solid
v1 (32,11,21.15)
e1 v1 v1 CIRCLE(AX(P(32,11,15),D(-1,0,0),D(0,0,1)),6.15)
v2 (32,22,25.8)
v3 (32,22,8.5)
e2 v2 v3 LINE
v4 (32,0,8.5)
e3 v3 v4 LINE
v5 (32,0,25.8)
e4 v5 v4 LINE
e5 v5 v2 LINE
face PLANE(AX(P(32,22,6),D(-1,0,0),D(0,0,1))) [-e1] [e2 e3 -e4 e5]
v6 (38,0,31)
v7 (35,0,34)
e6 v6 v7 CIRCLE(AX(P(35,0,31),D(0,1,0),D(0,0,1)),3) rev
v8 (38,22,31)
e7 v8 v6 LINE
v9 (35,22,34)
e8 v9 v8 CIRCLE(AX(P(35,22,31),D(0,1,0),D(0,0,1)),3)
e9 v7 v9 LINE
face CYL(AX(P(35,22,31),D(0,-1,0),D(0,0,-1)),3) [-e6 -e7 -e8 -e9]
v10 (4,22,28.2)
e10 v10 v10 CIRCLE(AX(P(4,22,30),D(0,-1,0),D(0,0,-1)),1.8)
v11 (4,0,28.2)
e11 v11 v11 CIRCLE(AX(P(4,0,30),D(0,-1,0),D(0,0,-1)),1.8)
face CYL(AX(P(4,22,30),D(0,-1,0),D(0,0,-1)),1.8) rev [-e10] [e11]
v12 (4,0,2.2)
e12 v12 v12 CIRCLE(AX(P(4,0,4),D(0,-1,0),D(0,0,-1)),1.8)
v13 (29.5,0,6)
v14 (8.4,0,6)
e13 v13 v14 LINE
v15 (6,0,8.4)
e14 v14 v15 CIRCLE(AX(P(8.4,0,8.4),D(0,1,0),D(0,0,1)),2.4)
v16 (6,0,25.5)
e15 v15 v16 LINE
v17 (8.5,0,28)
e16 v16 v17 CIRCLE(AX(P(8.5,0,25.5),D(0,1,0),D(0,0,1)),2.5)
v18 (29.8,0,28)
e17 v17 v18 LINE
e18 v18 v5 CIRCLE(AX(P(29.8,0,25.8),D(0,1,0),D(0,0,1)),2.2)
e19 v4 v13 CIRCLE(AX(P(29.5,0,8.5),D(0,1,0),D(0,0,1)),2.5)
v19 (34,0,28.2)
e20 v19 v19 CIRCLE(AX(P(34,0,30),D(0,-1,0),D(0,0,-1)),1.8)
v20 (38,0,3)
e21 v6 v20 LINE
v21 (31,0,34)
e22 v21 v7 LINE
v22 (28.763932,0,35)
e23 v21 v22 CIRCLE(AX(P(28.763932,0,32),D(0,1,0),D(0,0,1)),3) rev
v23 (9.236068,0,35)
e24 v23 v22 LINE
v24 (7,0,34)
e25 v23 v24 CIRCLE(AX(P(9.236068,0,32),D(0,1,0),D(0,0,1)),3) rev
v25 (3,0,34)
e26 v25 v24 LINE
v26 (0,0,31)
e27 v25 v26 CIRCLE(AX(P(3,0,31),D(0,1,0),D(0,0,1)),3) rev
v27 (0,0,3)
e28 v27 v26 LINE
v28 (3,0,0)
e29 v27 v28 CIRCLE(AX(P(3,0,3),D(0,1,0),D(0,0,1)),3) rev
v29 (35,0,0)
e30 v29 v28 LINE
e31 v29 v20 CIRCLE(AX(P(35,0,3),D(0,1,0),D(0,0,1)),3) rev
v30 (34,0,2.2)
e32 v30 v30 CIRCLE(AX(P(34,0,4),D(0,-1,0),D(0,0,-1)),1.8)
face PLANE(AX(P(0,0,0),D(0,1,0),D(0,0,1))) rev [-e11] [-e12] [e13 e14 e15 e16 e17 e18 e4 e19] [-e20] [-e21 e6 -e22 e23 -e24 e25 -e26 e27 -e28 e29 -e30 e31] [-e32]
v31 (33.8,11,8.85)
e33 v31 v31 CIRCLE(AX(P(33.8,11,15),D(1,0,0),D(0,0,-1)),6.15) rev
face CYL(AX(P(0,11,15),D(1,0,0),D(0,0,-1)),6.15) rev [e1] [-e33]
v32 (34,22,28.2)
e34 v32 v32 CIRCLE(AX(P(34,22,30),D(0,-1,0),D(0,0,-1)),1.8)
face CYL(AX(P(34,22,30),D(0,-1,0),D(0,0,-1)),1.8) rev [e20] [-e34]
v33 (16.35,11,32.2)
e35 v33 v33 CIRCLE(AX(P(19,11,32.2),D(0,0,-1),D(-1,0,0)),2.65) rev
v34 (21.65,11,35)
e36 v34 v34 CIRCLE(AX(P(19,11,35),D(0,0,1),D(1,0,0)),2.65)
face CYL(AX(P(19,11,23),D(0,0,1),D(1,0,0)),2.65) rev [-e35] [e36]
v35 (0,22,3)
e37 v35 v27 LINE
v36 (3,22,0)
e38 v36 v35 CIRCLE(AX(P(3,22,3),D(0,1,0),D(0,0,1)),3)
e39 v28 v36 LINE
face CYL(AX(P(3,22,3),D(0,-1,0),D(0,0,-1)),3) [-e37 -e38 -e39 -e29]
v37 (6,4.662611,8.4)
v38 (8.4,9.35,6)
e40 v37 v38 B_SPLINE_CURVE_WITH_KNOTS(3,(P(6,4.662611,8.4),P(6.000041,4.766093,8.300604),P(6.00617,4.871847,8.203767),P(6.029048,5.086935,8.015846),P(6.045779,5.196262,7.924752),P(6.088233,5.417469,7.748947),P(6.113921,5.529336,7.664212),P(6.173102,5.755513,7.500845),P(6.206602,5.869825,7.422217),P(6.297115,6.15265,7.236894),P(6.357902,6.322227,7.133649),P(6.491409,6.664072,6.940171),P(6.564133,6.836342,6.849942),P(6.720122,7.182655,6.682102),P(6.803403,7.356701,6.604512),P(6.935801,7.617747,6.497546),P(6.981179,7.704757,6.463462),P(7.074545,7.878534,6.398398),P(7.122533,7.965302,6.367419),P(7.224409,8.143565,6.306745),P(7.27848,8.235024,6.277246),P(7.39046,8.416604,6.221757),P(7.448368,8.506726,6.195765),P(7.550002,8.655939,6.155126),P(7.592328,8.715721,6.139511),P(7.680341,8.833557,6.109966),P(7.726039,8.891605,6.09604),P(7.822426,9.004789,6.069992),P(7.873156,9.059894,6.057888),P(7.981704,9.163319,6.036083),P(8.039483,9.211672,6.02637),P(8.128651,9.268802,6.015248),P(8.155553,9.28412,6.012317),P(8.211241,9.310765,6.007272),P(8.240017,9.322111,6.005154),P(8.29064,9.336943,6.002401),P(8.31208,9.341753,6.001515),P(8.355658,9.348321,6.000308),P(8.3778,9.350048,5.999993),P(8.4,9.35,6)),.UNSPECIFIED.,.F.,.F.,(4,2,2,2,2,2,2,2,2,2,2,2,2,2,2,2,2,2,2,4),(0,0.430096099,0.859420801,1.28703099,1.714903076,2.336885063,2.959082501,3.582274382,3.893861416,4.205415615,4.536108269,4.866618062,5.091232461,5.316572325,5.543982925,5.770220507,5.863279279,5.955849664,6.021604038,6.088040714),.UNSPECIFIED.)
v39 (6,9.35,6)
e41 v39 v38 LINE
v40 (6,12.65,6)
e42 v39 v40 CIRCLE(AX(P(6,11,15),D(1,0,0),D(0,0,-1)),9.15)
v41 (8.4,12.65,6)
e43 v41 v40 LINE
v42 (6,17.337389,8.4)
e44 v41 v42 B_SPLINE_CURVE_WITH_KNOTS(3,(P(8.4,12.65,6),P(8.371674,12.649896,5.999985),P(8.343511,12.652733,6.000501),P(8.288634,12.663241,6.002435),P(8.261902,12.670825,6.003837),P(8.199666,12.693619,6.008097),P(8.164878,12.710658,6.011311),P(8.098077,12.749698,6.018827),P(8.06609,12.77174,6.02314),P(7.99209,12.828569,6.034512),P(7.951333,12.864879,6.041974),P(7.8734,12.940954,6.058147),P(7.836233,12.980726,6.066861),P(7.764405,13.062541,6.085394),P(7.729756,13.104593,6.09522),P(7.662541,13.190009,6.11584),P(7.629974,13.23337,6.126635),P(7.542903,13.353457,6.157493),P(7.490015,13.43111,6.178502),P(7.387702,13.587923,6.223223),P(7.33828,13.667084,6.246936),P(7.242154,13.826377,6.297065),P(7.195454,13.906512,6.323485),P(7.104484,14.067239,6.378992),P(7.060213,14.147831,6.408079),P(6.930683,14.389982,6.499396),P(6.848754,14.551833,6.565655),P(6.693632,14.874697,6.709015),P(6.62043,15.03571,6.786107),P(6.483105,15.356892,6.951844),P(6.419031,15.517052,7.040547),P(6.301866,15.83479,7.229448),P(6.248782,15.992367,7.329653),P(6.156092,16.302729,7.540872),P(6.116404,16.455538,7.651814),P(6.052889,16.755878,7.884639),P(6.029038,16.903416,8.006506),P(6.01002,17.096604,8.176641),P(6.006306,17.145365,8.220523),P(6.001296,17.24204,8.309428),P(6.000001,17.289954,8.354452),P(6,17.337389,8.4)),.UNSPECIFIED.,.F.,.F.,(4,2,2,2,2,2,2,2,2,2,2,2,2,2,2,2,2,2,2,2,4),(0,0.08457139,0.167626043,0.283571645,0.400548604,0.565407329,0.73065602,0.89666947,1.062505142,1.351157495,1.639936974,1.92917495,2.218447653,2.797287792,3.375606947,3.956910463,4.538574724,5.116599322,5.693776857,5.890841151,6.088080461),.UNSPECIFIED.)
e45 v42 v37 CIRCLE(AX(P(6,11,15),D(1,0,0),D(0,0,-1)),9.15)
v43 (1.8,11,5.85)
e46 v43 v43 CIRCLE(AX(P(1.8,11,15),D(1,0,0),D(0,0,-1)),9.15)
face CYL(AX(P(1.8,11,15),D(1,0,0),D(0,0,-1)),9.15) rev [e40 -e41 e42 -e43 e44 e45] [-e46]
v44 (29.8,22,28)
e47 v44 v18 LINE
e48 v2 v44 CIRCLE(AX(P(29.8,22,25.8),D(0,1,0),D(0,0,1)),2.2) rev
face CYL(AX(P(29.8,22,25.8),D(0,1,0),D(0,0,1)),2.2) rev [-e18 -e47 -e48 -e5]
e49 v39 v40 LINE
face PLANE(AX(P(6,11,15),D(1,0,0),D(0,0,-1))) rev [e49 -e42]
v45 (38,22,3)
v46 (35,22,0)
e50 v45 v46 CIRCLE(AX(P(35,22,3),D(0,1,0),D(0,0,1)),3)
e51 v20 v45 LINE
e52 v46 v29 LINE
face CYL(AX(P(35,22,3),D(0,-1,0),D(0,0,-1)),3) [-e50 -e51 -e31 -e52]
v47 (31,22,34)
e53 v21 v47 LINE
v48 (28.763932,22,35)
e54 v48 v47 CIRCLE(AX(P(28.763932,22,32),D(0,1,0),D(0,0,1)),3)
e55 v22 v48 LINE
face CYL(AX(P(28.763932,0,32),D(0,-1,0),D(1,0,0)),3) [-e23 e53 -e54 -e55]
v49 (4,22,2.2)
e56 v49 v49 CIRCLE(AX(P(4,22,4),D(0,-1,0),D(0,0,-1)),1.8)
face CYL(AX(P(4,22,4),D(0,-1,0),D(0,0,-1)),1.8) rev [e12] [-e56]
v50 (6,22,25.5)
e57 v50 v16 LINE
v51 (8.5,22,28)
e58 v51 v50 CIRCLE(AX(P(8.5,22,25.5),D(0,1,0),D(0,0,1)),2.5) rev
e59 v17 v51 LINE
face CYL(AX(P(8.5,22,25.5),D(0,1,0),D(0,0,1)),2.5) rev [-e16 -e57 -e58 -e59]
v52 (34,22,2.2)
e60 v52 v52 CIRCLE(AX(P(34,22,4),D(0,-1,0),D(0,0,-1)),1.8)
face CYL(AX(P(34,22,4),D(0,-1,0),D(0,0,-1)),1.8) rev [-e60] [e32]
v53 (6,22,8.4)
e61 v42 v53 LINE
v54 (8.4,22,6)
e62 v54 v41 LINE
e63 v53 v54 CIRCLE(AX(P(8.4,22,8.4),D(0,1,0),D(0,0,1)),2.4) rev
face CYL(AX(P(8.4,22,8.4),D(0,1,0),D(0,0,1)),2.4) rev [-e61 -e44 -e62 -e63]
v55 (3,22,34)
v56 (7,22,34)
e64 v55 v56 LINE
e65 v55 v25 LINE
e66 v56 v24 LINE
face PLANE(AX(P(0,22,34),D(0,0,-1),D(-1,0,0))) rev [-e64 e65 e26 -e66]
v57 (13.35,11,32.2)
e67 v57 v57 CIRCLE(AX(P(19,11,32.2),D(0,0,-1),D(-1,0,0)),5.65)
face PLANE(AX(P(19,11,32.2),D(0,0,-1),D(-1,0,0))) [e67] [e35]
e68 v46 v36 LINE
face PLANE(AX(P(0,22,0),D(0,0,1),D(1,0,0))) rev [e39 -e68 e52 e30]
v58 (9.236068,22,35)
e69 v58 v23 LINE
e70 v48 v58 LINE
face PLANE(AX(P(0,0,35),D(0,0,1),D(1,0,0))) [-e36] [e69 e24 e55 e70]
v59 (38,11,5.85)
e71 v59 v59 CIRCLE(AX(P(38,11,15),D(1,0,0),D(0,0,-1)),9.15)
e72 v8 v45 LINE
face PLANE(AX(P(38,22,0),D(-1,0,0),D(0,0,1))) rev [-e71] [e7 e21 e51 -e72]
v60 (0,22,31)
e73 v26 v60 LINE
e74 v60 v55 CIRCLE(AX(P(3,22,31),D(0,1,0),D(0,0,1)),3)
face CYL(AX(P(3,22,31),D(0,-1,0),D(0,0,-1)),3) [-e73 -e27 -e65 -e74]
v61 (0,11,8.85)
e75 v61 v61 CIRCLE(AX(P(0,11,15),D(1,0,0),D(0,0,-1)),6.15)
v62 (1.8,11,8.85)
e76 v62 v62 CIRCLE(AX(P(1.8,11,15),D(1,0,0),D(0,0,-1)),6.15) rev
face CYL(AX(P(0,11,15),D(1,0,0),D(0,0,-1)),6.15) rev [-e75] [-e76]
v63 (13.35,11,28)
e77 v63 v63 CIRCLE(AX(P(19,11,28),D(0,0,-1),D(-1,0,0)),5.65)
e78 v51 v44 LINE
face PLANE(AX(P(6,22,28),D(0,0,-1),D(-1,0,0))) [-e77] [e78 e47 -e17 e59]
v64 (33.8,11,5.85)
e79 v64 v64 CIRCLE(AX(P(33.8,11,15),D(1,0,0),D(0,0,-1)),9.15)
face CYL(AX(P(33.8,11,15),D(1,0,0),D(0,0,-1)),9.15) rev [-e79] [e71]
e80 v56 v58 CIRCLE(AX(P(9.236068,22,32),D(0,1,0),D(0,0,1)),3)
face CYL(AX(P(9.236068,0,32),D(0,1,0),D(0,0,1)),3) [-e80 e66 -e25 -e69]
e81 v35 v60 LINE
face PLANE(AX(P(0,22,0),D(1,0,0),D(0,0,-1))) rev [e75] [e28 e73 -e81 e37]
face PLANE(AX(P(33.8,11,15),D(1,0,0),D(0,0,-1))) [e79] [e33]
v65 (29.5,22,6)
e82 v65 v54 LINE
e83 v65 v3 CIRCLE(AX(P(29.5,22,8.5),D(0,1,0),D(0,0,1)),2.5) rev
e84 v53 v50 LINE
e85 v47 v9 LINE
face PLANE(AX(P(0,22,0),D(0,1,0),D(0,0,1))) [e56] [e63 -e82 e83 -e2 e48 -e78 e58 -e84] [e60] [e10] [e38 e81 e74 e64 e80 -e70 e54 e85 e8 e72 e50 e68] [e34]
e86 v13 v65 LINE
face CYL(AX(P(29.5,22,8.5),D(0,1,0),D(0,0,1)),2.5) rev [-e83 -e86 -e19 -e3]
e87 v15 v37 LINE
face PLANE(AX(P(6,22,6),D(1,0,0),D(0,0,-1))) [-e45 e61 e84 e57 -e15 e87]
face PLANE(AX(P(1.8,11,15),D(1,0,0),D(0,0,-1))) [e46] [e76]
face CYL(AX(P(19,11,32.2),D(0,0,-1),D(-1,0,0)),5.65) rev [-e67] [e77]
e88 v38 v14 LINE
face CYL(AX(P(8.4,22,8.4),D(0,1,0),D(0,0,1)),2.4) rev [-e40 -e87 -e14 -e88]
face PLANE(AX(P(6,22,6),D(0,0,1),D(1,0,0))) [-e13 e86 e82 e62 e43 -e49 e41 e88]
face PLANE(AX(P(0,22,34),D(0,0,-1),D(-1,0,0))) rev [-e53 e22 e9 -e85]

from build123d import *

# Parameters (mm, degrees)
SKETCH3_W           = 38
SKETCH3_H           = 34
SKETCH3_W_2         = 26
SKETCH3_H_2         = 22
BOSS_EXTRUDE1_DEPTH = 22
SKETCH4_W           = 24
SKETCH4_H           = 22
BOSS_EXTRUDE2_DEPTH = 1
SKETCH5_R           = 2.65
CUT_EXTRUDE1_DEPTH  = 12
SKETCH7_R           = 5.65
CUT_EXTRUDE3_DEPTH  = 4.2
SKETCH8_R           = 6.15
CUT_EXTRUDE4_DEPTH  = 57.151580565
SKETCH9_R           = 9.15
CUT_EXTRUDE5_DEPTH  = 4.2
SKETCH10_R          = 9.15
CUT_EXTRUDE6_DEPTH  = 4.2
SKETCH15_R          = 1.8
CUT_EXTRUDE7_DEPTH  = 57.151580565
FILLET1_R           = 3
FILLET3_R           = 2.5
FILLET4_R           = 2.2
FILLET5_R           = 2.4


with BuildPart() as part:
    # Sketch3 → Boss-Extrude1 (new body)
    with BuildSketch(Plane(origin=(0, 0, 0), x_dir=(1, 0, 0), z_dir=(0, 1, 0))):
        with Locations((19, -17)):
            Rectangle(SKETCH3_W, SKETCH3_H)
        with Locations((19, -17)):
            Rectangle(SKETCH3_W_2, SKETCH3_H_2, mode=Mode.SUBTRACT)
    extrude(amount=BOSS_EXTRUDE1_DEPTH)

    # Sketch4 → Boss-Extrude2 (add)
    with BuildSketch(Plane.XY.offset(34)):
        with Locations((19, 11)):
            Rectangle(SKETCH4_W, SKETCH4_H)
    extrude(amount=BOSS_EXTRUDE2_DEPTH)

    # Sketch5 → Cut-Extrude1 (cut)
    with BuildSketch(Plane.XY.offset(35)):
        with Locations((19, 11)):
            Circle(SKETCH5_R)
    extrude(amount=-CUT_EXTRUDE1_DEPTH, mode=Mode.SUBTRACT)

    # Sketch7 → Cut-Extrude3 (cut)
    with BuildSketch(Plane(origin=(0, 0, 28), x_dir=(-1, 0, 0), z_dir=(0, 0, -1))):
        with Locations((-19, 11)):
            Circle(SKETCH7_R)
    extrude(amount=-CUT_EXTRUDE3_DEPTH, mode=Mode.SUBTRACT)

    # Sketch8 → Cut-Extrude4 (cut, through all)
    with BuildSketch(Plane(origin=(38, 0, 0), x_dir=(0, 0, -1), z_dir=(1, 0, 0))):
        with Locations((-15, 11)):
            Circle(SKETCH8_R)
    extrude(amount=-CUT_EXTRUDE4_DEPTH, mode=Mode.SUBTRACT)

    # Sketch9 → Cut-Extrude5 (cut)
    with BuildSketch(Plane(origin=(6, 0, 0), x_dir=(0, 0, -1), z_dir=(1, 0, 0))):
        with Locations((-15, 11)):
            Circle(SKETCH9_R)
    extrude(amount=-CUT_EXTRUDE5_DEPTH, mode=Mode.SUBTRACT)

    # Sketch10 → Cut-Extrude6 (cut)
    with BuildSketch(Plane(origin=(38, 0, 0), x_dir=(0, 0, -1), z_dir=(1, 0, 0))):
        with Locations((-15, 11)):
            Circle(SKETCH10_R)
    extrude(amount=-CUT_EXTRUDE6_DEPTH, mode=Mode.SUBTRACT)

    # Sketch15 → Cut-Extrude7 (cut, through all)
    with BuildSketch(Plane(origin=(0, 0, 0), x_dir=(-1, 0, 0), z_dir=(0, -1, 0))):
        with Locations(Location((-4, -30, 0), (0, 0, 90))):
            Circle(SKETCH15_R)
        with Locations(Location((-34, -30, 0), (0, 0, 90))):
            Circle(SKETCH15_R)
        with Locations(Location((-34, -4, 0), (0, 0, 90))):
            Circle(SKETCH15_R)
        with Locations(Location((-4, -4, 0), (0, 0, 90))):
            Circle(SKETCH15_R)
    extrude(amount=-CUT_EXTRUDE7_DEPTH, mode=Mode.SUBTRACT)

    # Fillet1
    # the kernel refuses this fillet: 3 mm, written as the material it takes off along each edge
    with BuildSketch(Plane(origin=(38, -7.5, 0), x_dir=(-1, 0, 0), z_dir=(0, 1, 0)), Plane(origin=(38, -7.5, 34), x_dir=(0, 0, -1), z_dir=(0, 1, 0))) as fillet1_piece_1:
        with BuildLine():
            CenterArc((FILLET1_R, FILLET1_R), FILLET1_R, 180, 90)
            Line((0, FILLET1_R), (-FILLET1_R * 0.02, FILLET1_R))
            Line((-FILLET1_R * 0.02, FILLET1_R), (-FILLET1_R * 0.02, -FILLET1_R * 0.02))
            Line((-FILLET1_R * 0.02, -FILLET1_R * 0.02), (FILLET1_R, -FILLET1_R * 0.02))
            Line((FILLET1_R, -FILLET1_R * 0.02), (FILLET1_R, 0))
        make_face()
    extrude(amount=37, mode=Mode.SUBTRACT)
    with BuildSketch(Plane(origin=(7, -5.590169944, 35), x_dir=(0, 0, -1), z_dir=(0, 1, 0)), Plane(origin=(31, 27.590169944, 35), x_dir=(0, 0, -1), z_dir=(0, -1, 0))) as fillet1_piece_2:
        with BuildLine():
            CenterArc((3, -2.236067977), FILLET1_R, 131.810314896, 48.189685104)
            Line((0, -2.236067977), (-0.06, -2.236067977))
            Line((-0.06, -2.236067977), (-0.06, 0))
            Line((-0.06, 0), (0, 0.06))
            ThreePointArc((0, 0.06), (0.5, 0.06), (0.96, 0.04472136))
            Line((0.96, 0.04472136), (1, 0))
        make_face()
    extrude(amount=33.180339887, mode=Mode.SUBTRACT)
    with BuildSketch(Plane(origin=(0, -7.5, 34), x_dir=(0, 0, -1), z_dir=(0, 1, 0)), Plane(origin=(0, -7.5, 0), x_dir=(1, 0, 0), z_dir=(0, 1, 0))) as fillet1_piece_3:
        with BuildLine():
            CenterArc((FILLET1_R, -FILLET1_R), FILLET1_R, 90, 90)
            Line((0, -FILLET1_R), (-FILLET1_R * 0.02, -FILLET1_R))
            Line((-FILLET1_R * 0.02, -FILLET1_R), (-FILLET1_R * 0.02, FILLET1_R * 0.02))
            Line((-FILLET1_R * 0.02, FILLET1_R * 0.02), (FILLET1_R, FILLET1_R * 0.02))
            Line((FILLET1_R, FILLET1_R * 0.02), (FILLET1_R, 0))
        make_face()
    extrude(amount=37, mode=Mode.SUBTRACT)

    # Fillet3
    fillet3_edges = [part.edges().sort_by_distance(p)[0] for p in [
        (6, 11, 28),
        (32, 11, 6),
    ]]
    fillet(fillet3_edges, radius=FILLET3_R)

    # Fillet4
    fillet4_edges = [part.edges().sort_by_distance(p)[0] for p in [
        (32, 11, 28),
    ]]
    fillet(fillet4_edges, radius=FILLET4_R)

    # Fillet5
    # the kernel refuses this fillet: 2.4 mm, written as the material it adds along each edge
    with BuildSketch(Plane(origin=(6, 6.65, 6), x_dir=(0, 0, 1), z_dir=(0, 1, 0))) as fillet5_piece_1_section:
        with BuildLine():
            CenterArc((FILLET5_R, FILLET5_R), FILLET5_R, 180, 90)
            Line((0, FILLET5_R), (0, 0))
            Line((0, 0), (FILLET5_R, 0))
        make_face()
    fillet5_piece_1 = extrude(amount=15.35, mode=Mode.PRIVATE)
    fillet5_piece_1 = fillet5_piece_1 - Plane(origin=(6.746267067, 11, 15), x_dir=(0, 0, -1), z_dir=(1, 0, 0)) * Cylinder(9.15, 41, mode=Mode.PRIVATE)
    add(fillet5_piece_1)
    with BuildSketch(Plane(origin=(6, 0, 6), x_dir=(0, 0, 1), z_dir=(0, 1, 0))) as fillet5_piece_2_section:
        with BuildLine():
            CenterArc((FILLET5_R, FILLET5_R), FILLET5_R, 180, 90)
            Line((0, FILLET5_R), (0, 0))
            Line((0, 0), (FILLET5_R, 0))
        make_face()
    fillet5_piece_2 = extrude(amount=15.35, mode=Mode.PRIVATE)
    fillet5_piece_2 = fillet5_piece_2 - Plane(origin=(6.573929996, 11, 15), x_dir=(0, 0, -1), z_dir=(1, 0, 0)) * Cylinder(9.15, 41, mode=Mode.PRIVATE)
    add(fillet5_piece_2)


solid = part.part
